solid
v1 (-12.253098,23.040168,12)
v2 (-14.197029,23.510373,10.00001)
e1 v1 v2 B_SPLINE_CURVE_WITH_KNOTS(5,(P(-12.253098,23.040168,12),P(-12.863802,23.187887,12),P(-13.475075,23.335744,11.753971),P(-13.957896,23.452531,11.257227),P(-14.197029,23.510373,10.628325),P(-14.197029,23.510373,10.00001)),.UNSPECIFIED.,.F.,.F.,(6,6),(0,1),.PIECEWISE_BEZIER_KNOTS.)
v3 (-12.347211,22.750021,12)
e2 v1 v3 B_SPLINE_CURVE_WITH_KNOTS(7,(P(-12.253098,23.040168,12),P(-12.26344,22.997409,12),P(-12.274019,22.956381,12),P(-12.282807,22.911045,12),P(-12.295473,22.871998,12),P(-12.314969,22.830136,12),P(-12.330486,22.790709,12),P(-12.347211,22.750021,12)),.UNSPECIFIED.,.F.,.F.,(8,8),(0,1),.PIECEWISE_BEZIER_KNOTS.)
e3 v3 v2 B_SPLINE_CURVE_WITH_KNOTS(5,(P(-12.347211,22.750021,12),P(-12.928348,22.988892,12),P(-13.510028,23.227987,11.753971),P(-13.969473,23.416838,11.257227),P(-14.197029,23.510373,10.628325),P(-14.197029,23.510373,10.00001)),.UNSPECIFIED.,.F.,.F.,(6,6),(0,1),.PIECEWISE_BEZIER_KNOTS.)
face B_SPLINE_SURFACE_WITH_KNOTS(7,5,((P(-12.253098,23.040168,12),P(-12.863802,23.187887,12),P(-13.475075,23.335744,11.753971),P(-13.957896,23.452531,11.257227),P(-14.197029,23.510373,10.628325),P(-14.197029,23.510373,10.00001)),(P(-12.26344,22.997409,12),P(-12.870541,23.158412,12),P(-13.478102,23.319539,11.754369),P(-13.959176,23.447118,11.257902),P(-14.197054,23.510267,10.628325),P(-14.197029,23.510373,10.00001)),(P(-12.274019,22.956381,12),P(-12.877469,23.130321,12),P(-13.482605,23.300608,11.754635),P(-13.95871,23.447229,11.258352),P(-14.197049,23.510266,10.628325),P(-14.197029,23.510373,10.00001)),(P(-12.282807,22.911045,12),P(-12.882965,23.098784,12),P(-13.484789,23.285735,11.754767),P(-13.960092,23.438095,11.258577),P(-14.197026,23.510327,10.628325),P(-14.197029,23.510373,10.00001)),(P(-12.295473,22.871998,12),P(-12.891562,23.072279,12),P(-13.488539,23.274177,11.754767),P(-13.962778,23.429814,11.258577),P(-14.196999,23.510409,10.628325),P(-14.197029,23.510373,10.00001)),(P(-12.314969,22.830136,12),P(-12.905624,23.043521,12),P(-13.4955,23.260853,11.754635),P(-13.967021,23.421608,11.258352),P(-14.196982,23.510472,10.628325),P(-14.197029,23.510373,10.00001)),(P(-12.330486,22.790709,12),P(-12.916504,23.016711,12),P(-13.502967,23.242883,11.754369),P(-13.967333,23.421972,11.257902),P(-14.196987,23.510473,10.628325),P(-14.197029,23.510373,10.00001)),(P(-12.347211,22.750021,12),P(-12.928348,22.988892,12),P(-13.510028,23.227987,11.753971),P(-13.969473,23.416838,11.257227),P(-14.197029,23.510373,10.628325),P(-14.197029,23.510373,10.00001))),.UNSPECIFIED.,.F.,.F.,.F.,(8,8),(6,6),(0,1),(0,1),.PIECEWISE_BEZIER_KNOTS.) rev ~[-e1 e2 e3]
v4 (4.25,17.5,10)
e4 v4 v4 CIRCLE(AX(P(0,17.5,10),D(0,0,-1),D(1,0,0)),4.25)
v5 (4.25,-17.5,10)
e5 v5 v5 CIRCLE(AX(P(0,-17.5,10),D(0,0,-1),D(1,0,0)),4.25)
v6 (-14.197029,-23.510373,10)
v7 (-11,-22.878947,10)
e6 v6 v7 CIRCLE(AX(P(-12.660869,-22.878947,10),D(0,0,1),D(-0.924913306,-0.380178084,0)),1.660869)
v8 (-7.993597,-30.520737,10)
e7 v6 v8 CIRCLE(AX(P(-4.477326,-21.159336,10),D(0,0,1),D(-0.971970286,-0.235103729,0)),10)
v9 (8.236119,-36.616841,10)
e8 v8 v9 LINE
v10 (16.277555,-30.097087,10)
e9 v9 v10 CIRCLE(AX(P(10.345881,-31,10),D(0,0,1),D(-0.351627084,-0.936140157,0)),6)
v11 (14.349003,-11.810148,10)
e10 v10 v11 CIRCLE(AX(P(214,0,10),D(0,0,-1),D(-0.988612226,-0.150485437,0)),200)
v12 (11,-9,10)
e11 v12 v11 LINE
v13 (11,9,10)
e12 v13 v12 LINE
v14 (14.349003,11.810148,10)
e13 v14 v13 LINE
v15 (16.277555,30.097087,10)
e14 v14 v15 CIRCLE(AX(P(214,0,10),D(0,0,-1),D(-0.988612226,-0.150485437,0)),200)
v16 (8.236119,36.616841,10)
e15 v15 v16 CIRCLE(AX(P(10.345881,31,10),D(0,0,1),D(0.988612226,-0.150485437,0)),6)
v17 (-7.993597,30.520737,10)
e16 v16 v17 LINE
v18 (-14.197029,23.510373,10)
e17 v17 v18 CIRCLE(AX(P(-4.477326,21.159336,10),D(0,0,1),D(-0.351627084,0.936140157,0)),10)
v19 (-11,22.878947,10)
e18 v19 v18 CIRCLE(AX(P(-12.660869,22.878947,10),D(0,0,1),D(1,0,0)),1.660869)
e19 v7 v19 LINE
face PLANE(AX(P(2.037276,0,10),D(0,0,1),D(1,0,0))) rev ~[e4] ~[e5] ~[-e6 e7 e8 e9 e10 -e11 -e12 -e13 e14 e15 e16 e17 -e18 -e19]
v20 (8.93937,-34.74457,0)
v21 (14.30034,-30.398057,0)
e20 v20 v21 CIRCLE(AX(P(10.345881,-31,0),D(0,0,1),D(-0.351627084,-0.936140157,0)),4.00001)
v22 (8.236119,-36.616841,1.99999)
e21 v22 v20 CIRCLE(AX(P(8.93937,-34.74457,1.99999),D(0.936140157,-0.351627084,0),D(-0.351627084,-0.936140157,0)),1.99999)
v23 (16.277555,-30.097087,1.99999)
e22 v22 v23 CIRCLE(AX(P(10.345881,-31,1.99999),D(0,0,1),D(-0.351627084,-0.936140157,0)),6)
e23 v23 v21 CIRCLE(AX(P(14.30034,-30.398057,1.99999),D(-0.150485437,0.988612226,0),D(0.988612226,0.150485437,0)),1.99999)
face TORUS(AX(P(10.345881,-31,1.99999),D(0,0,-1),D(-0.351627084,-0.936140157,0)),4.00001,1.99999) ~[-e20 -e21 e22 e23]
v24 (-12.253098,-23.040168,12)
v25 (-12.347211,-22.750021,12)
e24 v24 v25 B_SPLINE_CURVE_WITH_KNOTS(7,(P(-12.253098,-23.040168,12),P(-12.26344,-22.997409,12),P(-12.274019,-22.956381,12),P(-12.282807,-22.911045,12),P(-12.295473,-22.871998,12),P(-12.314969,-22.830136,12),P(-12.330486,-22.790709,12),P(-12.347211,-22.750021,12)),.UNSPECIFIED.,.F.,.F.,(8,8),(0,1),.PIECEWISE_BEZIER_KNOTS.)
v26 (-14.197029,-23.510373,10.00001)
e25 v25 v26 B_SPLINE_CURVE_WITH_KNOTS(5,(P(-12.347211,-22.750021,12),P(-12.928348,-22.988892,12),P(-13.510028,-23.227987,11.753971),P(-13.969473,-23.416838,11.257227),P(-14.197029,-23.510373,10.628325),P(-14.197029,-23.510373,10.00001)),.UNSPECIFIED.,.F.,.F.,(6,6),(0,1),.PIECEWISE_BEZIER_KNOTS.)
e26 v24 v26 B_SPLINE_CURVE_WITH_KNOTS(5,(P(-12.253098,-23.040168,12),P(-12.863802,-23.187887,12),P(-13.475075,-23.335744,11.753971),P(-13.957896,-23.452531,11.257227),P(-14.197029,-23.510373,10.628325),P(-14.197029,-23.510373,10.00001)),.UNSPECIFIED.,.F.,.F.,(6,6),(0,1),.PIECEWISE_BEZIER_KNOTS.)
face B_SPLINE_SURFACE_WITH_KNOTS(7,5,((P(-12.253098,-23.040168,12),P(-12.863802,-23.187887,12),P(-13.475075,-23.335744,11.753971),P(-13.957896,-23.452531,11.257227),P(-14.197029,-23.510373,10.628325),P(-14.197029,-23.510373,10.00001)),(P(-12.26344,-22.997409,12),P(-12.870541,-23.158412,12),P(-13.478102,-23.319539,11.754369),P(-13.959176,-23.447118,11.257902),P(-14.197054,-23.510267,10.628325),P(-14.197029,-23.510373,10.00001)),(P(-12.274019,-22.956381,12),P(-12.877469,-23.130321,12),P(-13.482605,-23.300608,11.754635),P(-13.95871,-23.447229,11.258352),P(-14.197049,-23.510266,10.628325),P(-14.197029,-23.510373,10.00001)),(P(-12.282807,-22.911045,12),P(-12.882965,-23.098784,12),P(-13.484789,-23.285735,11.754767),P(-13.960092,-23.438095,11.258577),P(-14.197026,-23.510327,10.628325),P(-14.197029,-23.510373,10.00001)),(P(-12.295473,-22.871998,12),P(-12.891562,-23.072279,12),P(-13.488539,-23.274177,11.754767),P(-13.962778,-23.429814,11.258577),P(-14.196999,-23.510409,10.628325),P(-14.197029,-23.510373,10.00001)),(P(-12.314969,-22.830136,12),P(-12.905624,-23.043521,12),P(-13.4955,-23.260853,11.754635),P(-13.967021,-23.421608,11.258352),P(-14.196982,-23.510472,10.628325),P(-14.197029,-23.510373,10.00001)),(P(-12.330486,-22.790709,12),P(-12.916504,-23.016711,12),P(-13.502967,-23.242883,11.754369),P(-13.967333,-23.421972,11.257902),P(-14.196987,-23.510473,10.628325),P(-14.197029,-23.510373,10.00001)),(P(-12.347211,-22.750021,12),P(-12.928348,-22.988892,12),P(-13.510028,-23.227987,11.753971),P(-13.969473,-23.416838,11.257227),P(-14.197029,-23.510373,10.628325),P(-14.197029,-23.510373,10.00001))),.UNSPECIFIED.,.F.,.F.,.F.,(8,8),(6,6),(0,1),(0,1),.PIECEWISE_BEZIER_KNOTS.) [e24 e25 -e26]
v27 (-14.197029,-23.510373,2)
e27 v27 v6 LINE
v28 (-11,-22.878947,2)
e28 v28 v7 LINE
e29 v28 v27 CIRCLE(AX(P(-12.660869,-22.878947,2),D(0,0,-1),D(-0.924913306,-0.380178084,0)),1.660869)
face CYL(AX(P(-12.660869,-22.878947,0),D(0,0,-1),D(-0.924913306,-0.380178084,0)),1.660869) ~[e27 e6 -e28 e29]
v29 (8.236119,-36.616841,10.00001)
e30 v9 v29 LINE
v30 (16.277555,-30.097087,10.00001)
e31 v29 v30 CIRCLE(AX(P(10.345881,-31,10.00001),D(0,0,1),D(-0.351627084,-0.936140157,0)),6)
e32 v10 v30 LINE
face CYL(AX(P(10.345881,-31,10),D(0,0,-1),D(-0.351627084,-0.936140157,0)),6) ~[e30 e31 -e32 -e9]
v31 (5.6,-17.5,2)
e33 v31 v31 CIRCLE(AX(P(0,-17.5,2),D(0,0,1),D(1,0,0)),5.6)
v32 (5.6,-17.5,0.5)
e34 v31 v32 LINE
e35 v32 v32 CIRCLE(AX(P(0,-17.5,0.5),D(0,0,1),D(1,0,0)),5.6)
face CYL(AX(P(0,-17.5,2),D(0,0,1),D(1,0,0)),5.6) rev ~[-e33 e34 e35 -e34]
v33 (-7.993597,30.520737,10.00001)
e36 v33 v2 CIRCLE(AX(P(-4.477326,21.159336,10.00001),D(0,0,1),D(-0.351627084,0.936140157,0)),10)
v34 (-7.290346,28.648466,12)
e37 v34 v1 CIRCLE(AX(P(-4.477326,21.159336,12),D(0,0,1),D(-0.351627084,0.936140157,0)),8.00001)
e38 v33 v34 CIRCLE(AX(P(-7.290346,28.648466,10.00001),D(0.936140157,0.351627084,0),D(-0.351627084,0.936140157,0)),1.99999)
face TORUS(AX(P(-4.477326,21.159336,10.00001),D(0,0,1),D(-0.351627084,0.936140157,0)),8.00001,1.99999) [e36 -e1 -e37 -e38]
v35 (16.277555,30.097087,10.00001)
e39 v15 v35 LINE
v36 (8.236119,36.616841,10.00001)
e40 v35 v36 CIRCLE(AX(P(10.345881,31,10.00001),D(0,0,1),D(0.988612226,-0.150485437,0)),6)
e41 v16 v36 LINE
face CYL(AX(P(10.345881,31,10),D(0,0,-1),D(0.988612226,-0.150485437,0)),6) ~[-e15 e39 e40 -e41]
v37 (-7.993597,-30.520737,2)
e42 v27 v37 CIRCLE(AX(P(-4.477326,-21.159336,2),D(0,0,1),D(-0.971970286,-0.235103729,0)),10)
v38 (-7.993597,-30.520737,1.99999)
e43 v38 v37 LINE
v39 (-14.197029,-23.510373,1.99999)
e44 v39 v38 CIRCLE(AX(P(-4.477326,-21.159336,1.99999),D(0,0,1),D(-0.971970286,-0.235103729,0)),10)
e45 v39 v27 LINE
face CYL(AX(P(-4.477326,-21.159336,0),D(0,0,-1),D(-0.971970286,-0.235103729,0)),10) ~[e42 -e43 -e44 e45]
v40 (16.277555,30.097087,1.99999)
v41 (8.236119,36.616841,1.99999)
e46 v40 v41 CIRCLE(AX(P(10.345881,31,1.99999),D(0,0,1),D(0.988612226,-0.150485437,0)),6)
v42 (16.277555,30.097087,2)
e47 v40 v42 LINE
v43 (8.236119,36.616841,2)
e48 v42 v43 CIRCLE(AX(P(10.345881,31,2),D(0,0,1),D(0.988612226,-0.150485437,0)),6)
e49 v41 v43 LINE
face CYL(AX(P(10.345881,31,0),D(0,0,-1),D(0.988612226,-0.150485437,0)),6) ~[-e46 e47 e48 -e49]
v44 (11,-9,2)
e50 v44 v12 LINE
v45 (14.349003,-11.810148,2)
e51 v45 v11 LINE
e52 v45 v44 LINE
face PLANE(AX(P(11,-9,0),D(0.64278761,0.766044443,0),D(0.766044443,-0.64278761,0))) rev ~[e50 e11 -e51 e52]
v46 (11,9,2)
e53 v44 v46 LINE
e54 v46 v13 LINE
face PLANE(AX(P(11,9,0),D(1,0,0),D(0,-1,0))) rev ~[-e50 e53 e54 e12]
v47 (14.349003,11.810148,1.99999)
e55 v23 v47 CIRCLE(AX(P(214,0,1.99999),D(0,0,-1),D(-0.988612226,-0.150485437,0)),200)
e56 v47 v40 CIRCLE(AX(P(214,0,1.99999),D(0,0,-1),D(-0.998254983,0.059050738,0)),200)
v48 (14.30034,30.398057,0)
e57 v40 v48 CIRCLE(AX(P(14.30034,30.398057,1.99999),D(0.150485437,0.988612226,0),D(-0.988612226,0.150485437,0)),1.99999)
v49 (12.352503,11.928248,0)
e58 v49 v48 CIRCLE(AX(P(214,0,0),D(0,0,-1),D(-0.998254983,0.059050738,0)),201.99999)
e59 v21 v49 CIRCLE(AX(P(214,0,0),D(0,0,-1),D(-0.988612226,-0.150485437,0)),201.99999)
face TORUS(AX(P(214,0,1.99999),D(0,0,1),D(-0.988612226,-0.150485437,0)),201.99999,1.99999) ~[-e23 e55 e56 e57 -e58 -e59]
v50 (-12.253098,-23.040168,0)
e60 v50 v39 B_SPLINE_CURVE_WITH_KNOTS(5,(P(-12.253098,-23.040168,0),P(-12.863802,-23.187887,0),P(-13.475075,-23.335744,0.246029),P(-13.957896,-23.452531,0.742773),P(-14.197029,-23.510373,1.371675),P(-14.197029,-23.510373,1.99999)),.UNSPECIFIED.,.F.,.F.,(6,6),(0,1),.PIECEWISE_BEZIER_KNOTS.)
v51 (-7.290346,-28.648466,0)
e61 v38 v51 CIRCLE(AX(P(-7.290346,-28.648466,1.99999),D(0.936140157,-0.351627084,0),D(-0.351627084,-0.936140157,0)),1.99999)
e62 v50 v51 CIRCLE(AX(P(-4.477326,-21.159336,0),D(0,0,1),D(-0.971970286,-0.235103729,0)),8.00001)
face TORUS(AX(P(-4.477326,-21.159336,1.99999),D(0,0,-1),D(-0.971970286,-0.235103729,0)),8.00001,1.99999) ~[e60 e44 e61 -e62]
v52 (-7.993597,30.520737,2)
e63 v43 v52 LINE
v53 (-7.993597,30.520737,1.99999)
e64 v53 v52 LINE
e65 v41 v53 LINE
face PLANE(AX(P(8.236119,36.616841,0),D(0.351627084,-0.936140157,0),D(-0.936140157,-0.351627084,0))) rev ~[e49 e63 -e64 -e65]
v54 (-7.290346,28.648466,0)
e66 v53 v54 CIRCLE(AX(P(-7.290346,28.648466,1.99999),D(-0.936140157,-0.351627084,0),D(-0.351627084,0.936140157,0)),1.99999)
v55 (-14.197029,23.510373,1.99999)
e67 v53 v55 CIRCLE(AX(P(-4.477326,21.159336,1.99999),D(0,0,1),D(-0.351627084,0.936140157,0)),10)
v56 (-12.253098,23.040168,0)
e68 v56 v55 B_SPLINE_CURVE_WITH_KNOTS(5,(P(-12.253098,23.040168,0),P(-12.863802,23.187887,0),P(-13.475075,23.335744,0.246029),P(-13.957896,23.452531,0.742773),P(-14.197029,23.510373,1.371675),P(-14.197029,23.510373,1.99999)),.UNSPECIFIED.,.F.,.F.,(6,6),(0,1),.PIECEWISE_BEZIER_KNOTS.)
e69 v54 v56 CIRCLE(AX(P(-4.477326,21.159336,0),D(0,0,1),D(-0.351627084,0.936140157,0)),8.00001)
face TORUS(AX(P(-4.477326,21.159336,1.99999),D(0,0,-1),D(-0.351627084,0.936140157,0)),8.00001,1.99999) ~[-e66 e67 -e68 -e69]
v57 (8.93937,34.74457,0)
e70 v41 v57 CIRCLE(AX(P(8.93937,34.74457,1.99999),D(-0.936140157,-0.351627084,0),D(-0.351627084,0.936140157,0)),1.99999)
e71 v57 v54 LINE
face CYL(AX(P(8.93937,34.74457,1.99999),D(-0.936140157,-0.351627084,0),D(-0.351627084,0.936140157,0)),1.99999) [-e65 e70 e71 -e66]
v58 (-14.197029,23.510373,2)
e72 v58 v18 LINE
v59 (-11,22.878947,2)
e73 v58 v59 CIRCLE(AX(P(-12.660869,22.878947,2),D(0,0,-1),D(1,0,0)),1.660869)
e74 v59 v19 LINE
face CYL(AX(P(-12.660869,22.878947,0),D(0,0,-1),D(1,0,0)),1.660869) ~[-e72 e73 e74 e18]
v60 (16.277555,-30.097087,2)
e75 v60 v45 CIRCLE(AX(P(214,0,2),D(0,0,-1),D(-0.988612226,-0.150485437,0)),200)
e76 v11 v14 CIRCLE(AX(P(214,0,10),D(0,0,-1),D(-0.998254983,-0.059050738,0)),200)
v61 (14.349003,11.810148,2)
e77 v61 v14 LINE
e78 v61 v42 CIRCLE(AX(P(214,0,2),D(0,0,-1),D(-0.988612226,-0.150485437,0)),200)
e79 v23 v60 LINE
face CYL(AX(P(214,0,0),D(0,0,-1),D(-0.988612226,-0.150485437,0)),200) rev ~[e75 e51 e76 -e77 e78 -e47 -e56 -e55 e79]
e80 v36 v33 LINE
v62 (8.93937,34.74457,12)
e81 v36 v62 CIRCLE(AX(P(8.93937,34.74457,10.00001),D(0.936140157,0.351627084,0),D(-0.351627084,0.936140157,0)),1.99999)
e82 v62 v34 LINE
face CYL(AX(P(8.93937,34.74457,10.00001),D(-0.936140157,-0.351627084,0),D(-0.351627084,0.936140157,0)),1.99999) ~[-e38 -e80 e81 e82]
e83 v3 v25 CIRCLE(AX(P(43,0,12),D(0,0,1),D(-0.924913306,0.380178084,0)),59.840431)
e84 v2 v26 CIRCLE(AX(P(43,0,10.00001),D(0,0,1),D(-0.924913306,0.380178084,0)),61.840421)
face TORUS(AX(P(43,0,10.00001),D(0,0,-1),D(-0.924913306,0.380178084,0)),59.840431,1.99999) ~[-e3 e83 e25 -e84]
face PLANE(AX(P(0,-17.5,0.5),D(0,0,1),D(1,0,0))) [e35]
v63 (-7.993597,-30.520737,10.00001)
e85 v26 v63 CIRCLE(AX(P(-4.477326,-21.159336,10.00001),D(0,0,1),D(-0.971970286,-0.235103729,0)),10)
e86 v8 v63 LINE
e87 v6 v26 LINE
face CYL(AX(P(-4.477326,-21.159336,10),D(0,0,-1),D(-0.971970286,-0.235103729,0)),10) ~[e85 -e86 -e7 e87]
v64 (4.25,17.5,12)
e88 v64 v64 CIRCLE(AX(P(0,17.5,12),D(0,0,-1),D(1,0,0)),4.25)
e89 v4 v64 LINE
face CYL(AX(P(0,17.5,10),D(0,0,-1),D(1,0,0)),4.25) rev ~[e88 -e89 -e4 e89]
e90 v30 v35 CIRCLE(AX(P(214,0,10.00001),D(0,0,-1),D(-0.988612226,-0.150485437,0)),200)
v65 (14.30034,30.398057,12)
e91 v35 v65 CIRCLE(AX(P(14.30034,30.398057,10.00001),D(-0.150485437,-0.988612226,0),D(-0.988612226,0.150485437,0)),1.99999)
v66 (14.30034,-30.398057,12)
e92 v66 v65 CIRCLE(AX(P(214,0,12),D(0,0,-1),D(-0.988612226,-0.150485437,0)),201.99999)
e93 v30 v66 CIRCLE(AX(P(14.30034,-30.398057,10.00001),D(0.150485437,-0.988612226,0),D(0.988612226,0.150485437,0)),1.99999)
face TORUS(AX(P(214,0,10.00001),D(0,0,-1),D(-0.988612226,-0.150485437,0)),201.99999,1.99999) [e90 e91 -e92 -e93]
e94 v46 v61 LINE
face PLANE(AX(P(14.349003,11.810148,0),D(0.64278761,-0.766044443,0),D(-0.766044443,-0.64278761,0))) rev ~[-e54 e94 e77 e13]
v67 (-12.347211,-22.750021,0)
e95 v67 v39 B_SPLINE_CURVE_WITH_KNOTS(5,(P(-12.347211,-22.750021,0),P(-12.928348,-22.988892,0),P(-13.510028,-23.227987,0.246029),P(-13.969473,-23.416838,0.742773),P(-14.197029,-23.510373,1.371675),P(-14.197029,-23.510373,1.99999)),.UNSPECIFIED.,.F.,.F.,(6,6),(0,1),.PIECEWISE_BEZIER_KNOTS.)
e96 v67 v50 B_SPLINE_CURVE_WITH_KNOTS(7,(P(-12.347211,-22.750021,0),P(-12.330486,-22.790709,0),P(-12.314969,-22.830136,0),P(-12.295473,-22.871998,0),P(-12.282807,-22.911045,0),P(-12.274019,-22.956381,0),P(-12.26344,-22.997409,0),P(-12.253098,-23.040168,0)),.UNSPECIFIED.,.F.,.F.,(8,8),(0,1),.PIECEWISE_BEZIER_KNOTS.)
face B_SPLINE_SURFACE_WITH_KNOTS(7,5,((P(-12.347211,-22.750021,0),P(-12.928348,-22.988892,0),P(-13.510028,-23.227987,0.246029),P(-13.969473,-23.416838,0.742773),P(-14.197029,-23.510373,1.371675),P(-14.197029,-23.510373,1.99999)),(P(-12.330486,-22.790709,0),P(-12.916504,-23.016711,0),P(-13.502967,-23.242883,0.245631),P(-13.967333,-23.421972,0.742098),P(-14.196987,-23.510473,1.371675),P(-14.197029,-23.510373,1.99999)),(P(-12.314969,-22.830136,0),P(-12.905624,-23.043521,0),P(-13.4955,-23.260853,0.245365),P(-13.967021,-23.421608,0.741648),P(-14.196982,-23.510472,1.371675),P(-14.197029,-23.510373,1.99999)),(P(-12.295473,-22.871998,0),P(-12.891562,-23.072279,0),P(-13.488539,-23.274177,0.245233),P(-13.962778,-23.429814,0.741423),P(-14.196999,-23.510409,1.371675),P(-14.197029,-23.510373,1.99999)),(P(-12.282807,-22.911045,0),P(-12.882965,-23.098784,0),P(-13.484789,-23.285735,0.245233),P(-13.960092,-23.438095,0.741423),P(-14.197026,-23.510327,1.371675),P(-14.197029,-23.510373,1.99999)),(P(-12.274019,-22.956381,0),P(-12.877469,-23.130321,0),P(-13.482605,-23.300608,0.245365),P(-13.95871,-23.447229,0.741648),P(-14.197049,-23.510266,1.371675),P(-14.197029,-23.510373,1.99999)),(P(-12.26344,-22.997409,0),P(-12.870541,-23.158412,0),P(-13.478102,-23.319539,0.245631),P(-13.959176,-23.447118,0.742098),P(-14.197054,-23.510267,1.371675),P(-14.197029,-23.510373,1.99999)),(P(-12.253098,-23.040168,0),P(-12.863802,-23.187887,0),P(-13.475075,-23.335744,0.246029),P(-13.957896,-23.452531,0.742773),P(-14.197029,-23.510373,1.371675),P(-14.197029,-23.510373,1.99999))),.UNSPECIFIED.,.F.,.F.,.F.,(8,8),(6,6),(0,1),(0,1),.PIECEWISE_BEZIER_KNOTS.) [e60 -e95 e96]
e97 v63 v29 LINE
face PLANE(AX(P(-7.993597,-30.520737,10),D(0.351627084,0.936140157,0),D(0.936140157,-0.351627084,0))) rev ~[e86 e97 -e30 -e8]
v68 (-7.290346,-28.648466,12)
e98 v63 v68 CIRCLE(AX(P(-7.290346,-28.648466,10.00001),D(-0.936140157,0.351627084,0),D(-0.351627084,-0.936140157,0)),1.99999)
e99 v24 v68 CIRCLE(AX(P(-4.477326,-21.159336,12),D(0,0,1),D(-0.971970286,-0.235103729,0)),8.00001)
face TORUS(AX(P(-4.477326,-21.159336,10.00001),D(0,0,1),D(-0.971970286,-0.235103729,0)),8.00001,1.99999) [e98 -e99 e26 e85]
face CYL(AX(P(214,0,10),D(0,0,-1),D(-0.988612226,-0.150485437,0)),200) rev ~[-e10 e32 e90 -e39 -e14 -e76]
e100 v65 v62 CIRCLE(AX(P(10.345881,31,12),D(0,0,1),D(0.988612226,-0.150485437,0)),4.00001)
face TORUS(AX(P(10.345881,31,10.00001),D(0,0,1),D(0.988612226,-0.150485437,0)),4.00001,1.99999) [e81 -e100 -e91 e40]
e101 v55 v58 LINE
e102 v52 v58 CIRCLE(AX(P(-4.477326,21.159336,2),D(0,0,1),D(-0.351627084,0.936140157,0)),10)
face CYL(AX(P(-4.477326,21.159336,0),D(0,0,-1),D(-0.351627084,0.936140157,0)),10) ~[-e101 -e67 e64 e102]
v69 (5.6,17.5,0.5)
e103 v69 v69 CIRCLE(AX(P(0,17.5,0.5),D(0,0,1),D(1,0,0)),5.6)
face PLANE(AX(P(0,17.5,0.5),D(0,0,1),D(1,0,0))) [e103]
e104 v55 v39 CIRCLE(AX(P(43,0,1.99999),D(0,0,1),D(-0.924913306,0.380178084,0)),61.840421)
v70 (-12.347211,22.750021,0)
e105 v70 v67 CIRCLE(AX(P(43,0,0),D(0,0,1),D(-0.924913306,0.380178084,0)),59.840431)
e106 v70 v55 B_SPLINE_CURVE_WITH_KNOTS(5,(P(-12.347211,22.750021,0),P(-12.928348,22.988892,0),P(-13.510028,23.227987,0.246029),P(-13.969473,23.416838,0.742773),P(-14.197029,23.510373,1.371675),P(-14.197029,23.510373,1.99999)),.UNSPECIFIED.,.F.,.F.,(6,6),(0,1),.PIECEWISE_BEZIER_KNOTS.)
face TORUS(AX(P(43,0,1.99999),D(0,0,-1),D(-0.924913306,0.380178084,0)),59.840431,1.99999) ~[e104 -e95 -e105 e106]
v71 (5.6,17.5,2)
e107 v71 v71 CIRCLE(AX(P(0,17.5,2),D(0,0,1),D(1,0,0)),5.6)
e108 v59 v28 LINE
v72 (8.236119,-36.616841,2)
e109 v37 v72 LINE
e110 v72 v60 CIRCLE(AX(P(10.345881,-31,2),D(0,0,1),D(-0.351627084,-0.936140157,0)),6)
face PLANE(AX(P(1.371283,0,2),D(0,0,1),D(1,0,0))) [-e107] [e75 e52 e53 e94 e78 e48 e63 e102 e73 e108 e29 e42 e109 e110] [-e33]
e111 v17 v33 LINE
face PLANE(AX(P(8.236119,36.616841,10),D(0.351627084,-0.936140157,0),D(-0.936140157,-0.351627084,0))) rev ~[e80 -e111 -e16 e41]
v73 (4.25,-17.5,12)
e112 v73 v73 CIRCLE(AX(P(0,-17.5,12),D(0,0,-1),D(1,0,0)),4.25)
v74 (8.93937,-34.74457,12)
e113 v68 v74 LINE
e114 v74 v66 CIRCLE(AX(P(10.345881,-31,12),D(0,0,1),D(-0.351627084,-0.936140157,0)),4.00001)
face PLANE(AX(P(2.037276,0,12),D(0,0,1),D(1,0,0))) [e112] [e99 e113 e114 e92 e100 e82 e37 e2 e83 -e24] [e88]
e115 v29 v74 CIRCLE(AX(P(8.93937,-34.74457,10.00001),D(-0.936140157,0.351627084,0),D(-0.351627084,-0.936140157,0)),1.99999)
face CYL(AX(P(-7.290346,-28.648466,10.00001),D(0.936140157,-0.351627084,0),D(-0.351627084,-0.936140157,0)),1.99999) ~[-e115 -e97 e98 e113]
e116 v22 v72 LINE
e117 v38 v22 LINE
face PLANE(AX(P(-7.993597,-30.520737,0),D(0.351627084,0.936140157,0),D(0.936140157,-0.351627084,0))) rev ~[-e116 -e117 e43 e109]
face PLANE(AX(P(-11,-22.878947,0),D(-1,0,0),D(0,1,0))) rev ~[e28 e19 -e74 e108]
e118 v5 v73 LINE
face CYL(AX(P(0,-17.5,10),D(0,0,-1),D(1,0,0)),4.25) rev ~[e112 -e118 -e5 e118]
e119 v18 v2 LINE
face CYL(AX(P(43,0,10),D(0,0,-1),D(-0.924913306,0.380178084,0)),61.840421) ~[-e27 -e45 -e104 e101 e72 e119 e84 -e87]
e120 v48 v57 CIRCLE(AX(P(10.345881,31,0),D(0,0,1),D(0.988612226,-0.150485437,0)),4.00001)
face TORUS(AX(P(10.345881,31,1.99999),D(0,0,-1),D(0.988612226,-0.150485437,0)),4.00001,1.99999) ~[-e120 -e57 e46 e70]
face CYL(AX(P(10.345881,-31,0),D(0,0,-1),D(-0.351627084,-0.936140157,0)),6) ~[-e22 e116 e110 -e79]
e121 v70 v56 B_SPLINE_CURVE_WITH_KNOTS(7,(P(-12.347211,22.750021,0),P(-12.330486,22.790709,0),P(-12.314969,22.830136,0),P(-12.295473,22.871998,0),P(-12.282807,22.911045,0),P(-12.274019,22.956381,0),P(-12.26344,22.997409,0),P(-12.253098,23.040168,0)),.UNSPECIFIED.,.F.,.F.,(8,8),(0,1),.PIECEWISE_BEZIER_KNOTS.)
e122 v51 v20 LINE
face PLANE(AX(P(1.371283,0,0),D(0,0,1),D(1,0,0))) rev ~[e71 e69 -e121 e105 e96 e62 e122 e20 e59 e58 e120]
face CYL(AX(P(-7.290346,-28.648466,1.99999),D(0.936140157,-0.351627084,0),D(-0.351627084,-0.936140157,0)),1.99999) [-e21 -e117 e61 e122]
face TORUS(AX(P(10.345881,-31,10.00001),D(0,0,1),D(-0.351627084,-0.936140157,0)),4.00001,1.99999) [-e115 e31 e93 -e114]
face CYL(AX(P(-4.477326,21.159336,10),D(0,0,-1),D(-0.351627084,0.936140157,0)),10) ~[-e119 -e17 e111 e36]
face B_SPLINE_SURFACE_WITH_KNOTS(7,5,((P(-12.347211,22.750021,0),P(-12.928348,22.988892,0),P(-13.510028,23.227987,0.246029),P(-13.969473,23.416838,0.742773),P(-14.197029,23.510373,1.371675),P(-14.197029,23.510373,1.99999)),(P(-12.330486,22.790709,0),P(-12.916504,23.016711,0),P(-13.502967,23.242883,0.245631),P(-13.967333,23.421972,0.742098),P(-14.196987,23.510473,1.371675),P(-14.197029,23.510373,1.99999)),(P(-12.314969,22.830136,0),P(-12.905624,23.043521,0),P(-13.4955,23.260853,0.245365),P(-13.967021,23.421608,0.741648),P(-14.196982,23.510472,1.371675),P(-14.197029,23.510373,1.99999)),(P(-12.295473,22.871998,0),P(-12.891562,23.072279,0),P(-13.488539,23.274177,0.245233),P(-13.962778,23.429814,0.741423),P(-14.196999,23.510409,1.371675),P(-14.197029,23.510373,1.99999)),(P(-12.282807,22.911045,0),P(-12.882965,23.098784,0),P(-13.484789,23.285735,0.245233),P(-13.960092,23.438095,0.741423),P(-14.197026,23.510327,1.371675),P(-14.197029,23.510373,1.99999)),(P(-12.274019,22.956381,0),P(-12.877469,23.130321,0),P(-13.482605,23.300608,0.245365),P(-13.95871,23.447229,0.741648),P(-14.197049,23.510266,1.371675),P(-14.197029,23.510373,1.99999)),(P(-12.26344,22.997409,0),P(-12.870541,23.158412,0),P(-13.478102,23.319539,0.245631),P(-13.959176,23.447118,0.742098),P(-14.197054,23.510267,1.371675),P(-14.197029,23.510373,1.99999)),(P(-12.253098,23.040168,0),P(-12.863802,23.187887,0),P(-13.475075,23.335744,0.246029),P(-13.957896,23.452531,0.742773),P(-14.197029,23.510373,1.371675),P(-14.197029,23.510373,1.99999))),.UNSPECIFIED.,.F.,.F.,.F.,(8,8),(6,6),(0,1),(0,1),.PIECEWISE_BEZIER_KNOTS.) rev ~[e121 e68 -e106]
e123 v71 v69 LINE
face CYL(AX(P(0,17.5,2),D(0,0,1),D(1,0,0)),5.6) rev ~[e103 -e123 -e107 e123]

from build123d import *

# Parameters (mm, degrees)
F1_DEPTH  = 2
F2_R      = 5.6
F3_DEPTH  = 1.5
F5_DEPTH  = 10
F7_DEPTH  = 2
F8_R      = 1.99999
F9_R      = 4.25
F10_DEPTH = 2


# Not quite as in the source:
# - a fillet or chamfer is up to 0.001 mm smaller than in the source, because OpenCascade refuses the exact size


with BuildPart() as f1:
    # F0 (on Top) → F1 (new body)
    with BuildSketch(Plane.XY):
        with BuildLine():
            Line((8.2361189543, 36.6168409437), (-7.9935965644, 30.5207371811))
            ThreePointArc((-7.9935965644, 30.5207371811), (-11.9662543406, 27.7862465208), (-14.1970285873, 23.510372898))
            ThreePointArc((-14.1970285873, 23.510372898), (-17, 0), (-14.1970285873, -23.510372898))
            ThreePointArc((-14.1970285873, -23.510372898), (-11.9662543406, -27.7862465208), (-7.9935965644, -30.5207371811))
            Line((-7.9935965644, -30.5207371811), (8.2361189543, -36.6168409437))
            ThreePointArc((8.2361189543, -36.6168409437), (14.1245779615, -35.6606279318), (16.2775548115, -30.0970873786))
            ThreePointArc((16.2775548115, -30.0970873786), (14, 0), (16.2775548115, 30.0970873786))
            ThreePointArc((16.2775548115, 30.0970873786), (14.1245779615, 35.6606279318), (8.2361189543, 36.6168409437))
        make_face()
    extrude(amount=F1_DEPTH)

    # F2 (on face) → F3 (cut)
    with BuildSketch(Plane.XY.offset(2)):
        with Locations((0, 17.5)):
            Circle(F2_R)
        with Locations((0, -17.5)):
            Circle(F2_R)
    extrude(amount=-F3_DEPTH, mode=Mode.SUBTRACT)

    # F4 (on Top) → F5 (join)
    with BuildSketch(Plane.XY):
        with BuildLine():
            Line((-11, -22.8789469535), (-11, 22.8789469535))
            ThreePointArc((-11, 22.8789469535), (-12.3390571638, 24.5083402847), (-14.1970285873, 23.510372898))
            ThreePointArc((-14.1970285873, 23.510372898), (-18.8404213522, 0), (-14.1970285873, -23.510372898))
            ThreePointArc((-14.1970285873, -23.510372898), (-12.3390571638, -24.5083402847), (-11, -22.8789469535))
        make_face()
        with BuildLine():
            Line((14.3490034732, 11.8101475791), (11, 9))
            Line((11, 9), (11, -9))
            Line((11, -9), (14.3490034732, -11.8101475791))
            ThreePointArc((14.3490034732, -11.8101475791), (14, 0), (14.3490034732, 11.8101475791))
        make_face()
    extrude(amount=F5_DEPTH)

    # F6 (on face) → F7 (join)
    with BuildSketch(Plane.XY.offset(10)):
        with BuildLine():
            Line((8.2361189543, 36.6168409437), (-7.9935965644, 30.5207371811))
            ThreePointArc((-7.9935965644, 30.5207371811), (-11.9662543406, 27.7862465208), (-14.1970285873, 23.510372898))
            ThreePointArc((-14.1970285873, 23.510372898), (-12.3390571638, 24.5083402847), (-11, 22.8789469535))
            Line((-11, 22.8789469535), (-11, -22.8789469535))
            ThreePointArc((-11, -22.8789469535), (-12.3390571638, -24.5083402847), (-14.1970285873, -23.510372898))
            ThreePointArc((-14.1970285873, -23.510372898), (-11.9662543406, -27.7862465208), (-7.9935965644, -30.5207371811))
            Line((-7.9935965644, -30.5207371811), (8.2361189543, -36.6168409437))
            ThreePointArc((8.2361189543, -36.6168409437), (14.1245779615, -35.6606279318), (16.2775548115, -30.0970873786))
            ThreePointArc((16.2775548115, -30.0970873786), (14, 0), (16.2775548115, 30.0970873786))
            ThreePointArc((16.2775548115, 30.0970873786), (14.1245779615, 35.6606279318), (8.2361189543, 36.6168409437))
        make_face()
        with BuildLine():
            ThreePointArc((-11, 22.8789469535), (-12.3390571638, 24.5083402847), (-14.1970285873, 23.510372898))
            ThreePointArc((-14.1970285873, 23.510372898), (-18.8404213522, 0), (-14.1970285873, -23.510372898))
            ThreePointArc((-14.1970285873, -23.510372898), (-12.3390571638, -24.5083402847), (-11, -22.8789469535))
            Line((-11, -22.8789469535), (-11, 22.8789469535))
        make_face()
    extrude(amount=F7_DEPTH)

    # F8 (radius 2 in the source; OpenCascade refuses exactly that, so slightly less here)
    f8_edges = [f1.edges().sort_by_distance(p)[0] for p in [
        (14.124578, 35.660628, 12),
        (0.121261, 33.568789, 12),
        (-11.966254, 27.786247, 12),
        (-18.840421, 0, 12),
        (-11.966254, -27.786247, 12),
        (0.121261, -33.568789, 12),
        (14.124578, -35.660628, 12),
        (14, 0, 12),
        (-18.840421, 0, 0),
        (14, 0, 0),
    ]]
    fillet(f8_edges, radius=F8_R)

    # F9 (on face) → F10 (cut)
    with BuildSketch(Plane(origin=(0, 0, 10), x_dir=(1, 0, 0), z_dir=(0, 0, -1))):
        with Locations((0, 17.5)):
            Circle(F9_R)
        with Locations((0, -17.5)):
            Circle(F9_R)
    extrude(amount=-F10_DEPTH, mode=Mode.SUBTRACT)


solid = f1.part
